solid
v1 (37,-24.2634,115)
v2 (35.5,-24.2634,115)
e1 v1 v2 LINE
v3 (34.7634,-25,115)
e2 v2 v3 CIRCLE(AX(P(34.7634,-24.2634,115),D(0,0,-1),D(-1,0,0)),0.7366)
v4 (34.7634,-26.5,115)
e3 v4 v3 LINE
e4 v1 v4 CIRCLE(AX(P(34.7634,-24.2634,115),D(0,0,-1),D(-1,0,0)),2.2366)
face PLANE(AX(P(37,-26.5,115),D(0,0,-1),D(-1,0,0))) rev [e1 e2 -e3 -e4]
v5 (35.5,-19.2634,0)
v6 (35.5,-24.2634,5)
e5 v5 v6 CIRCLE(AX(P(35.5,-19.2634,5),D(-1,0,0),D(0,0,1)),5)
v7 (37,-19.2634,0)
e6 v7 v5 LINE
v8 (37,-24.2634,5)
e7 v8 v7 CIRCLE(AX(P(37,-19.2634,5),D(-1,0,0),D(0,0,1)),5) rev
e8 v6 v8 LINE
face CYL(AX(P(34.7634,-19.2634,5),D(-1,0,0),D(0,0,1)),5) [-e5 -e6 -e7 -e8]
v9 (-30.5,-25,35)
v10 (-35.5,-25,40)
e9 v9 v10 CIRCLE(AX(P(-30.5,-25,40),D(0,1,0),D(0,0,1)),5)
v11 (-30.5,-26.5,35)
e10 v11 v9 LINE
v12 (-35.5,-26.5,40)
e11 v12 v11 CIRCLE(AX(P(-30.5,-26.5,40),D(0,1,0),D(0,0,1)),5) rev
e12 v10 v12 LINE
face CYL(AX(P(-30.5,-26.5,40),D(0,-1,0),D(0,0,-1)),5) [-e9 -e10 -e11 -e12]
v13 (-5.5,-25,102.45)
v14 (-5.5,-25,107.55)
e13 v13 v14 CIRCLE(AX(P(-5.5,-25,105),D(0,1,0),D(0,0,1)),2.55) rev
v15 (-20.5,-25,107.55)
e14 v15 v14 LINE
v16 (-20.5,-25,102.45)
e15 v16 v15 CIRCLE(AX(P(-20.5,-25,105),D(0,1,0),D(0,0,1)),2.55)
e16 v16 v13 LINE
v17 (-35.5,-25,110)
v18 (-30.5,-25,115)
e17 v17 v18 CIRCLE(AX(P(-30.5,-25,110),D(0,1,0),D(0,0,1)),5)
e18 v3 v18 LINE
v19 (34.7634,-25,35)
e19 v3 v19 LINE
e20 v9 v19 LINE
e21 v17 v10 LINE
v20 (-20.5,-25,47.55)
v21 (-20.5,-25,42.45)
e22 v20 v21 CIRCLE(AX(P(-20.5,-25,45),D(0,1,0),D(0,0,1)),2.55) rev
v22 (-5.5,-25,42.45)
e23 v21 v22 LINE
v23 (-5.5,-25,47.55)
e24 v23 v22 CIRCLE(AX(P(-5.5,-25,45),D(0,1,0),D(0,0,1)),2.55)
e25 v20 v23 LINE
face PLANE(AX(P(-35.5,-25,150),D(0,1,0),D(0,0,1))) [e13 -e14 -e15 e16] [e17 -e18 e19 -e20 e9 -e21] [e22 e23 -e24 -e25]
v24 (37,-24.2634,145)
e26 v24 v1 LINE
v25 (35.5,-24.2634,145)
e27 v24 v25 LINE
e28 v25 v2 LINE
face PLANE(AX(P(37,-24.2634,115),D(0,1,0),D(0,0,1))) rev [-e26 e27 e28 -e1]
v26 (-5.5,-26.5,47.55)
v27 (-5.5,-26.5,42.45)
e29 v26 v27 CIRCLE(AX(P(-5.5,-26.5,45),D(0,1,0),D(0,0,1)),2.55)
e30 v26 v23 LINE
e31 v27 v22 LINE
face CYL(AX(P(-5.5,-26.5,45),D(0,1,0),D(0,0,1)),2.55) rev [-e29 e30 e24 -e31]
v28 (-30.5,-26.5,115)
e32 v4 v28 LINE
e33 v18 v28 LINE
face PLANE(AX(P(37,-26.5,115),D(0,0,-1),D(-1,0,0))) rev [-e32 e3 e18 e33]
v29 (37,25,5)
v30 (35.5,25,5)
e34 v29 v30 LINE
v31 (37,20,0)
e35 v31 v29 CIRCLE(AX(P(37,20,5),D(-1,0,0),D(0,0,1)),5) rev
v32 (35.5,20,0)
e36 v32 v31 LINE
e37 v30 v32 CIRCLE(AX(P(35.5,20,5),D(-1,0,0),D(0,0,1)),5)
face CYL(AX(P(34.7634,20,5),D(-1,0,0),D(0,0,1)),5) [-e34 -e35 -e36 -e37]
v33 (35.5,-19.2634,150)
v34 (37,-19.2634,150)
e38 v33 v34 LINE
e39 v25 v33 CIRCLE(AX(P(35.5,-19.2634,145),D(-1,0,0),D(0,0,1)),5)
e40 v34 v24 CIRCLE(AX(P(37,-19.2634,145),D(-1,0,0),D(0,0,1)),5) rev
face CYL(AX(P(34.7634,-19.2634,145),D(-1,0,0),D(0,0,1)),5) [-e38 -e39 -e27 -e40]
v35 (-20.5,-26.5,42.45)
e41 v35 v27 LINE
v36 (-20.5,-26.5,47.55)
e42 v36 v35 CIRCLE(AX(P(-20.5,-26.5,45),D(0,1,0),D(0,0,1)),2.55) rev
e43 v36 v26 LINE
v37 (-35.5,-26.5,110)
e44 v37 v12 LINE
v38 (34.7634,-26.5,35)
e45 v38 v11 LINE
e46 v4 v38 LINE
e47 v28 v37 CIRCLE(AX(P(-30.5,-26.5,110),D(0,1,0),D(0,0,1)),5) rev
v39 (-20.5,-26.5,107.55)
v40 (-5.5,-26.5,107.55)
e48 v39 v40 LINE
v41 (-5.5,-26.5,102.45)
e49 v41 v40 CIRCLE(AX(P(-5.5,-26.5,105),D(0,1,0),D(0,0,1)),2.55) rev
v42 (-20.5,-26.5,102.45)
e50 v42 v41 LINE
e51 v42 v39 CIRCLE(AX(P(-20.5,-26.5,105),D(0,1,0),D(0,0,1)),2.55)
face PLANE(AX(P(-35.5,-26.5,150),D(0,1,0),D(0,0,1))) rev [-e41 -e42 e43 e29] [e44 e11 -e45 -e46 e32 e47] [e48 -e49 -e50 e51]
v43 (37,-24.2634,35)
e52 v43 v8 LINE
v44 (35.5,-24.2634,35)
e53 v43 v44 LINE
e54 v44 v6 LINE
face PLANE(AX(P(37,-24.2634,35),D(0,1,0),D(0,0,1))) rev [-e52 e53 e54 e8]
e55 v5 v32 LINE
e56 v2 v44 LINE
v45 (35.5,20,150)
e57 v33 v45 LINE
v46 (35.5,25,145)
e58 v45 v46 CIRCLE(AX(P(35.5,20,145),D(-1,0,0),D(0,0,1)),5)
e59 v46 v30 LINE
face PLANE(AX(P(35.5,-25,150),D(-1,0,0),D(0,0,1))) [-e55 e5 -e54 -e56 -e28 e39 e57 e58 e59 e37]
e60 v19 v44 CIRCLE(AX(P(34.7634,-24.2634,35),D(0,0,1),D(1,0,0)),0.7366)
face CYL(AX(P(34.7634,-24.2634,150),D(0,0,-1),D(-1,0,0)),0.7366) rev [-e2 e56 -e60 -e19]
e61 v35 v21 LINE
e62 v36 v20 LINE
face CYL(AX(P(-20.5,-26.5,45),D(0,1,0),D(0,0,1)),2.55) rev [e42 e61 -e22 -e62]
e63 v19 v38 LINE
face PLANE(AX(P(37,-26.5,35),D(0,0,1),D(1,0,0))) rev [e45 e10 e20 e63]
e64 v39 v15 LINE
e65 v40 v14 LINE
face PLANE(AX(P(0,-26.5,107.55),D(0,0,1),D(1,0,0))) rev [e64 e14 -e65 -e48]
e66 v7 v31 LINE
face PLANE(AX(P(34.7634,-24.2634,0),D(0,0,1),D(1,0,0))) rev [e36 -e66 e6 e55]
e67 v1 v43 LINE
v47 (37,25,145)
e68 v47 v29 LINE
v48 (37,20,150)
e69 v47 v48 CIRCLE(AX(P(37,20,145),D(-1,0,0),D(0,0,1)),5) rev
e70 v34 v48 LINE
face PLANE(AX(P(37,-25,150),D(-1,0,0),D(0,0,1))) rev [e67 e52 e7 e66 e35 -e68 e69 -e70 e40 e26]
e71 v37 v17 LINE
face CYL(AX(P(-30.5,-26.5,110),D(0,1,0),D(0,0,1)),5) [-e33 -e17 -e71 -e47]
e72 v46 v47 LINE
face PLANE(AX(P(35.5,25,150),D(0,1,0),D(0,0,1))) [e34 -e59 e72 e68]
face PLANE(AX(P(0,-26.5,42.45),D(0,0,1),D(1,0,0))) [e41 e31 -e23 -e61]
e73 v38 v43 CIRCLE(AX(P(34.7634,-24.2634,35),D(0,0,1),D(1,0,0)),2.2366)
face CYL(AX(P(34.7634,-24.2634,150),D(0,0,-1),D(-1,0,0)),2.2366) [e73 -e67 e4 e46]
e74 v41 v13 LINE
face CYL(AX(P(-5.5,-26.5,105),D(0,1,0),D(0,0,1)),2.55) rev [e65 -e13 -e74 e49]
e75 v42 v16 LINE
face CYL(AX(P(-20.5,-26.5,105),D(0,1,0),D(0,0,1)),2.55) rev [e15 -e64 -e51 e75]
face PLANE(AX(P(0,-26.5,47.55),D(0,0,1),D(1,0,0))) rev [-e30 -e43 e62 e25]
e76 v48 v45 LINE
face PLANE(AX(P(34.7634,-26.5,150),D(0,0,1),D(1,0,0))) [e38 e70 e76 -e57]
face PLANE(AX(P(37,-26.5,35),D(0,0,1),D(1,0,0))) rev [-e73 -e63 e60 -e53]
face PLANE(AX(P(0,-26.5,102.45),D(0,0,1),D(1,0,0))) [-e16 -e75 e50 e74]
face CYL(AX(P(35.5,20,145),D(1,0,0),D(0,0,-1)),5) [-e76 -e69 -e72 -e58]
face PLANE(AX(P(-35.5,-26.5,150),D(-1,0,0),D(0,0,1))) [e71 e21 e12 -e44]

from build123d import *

# Parameters (mm, degrees)
BASE_FLANGE1_DEPTH = 150
CUT_EXTRUDE2_DEPTH = 163.385344166
SKETCH5_W          = 35
SKETCH5_H          = 2.2366
CUT_EXTRUDE3_DEPTH = 169.696472992
FILLET1_R          = 5


# Sheet-metal steps are written as plain solids
with BuildPart() as part:
    # Sketch1 → Base-Flange1 (new body)
    with BuildSketch(Plane.XY):
        with BuildLine():
            Line((-35.5, -25), (34.7634, -25))
            ThreePointArc((34.7634, -25), (35.284254855, -24.784254855), (35.5, -24.2634))
            Line((35.5, -24.2634), (35.5, 25))
            Line((35.5, 25), (37, 25))
            Line((37, 25), (37, -24.2634))
            ThreePointArc((37, -24.2634), (36.344915027, -25.844915027), (34.7634, -26.5))
            Line((34.7634, -26.5), (-35.5, -26.5))
            Line((-35.5, -26.5), (-35.5, -25))
        make_face()
    extrude(amount=BASE_FLANGE1_DEPTH)

    # Sketch4 → Cut-Extrude2 (cut, through all)
    with BuildSketch(Plane(origin=(0, -25, 0), x_dir=(1, 0, 0), z_dir=(0, 1, 0))):
        with BuildLine():
            Line((-20.5, -102.45), (-5.5, -102.45))
            ThreePointArc((-5.5, -102.45), (-2.95, -105), (-5.5, -107.55))
            Line((-5.5, -107.55), (-20.5, -107.55))
            ThreePointArc((-20.5, -107.55), (-23.05, -105), (-20.5, -102.45))
        make_face()
        with BuildLine():
            Line((-20.5, -42.45), (-5.5, -42.45))
            ThreePointArc((-5.5, -42.45), (-2.95, -45), (-5.5, -47.55))
            Line((-5.5, -47.55), (-20.5, -47.55))
            ThreePointArc((-20.5, -47.55), (-23.05, -45), (-20.5, -42.45))
        make_face()
    extrude(amount=-CUT_EXTRUDE2_DEPTH, mode=Mode.SUBTRACT)

    # Sketch5 → Cut-Extrude3 (cut, through all)
    with BuildSketch(Plane.ZY.offset(35.5)):
        with Locations((132.5, -25.3817)):
            Rectangle(SKETCH5_W, SKETCH5_H)
        with Locations((17.5, -25.3817)):
            Rectangle(SKETCH5_W, SKETCH5_H)
    extrude(amount=-CUT_EXTRUDE3_DEPTH, mode=Mode.SUBTRACT)

    # Fillet1
    fillet1_edges = [part.edges().sort_by_distance(p)[0] for p in [
        (36.25, -24.2634, 0),
        (36.25, -24.2634, 150),
        (36.25, 25, 150),
        (-35.5, -25.75, 115),
        (36.25, 25, 0),
        (-35.5, -25.75, 35),
    ]]
    fillet(fillet1_edges, radius=FILLET1_R)


solid = part.part
